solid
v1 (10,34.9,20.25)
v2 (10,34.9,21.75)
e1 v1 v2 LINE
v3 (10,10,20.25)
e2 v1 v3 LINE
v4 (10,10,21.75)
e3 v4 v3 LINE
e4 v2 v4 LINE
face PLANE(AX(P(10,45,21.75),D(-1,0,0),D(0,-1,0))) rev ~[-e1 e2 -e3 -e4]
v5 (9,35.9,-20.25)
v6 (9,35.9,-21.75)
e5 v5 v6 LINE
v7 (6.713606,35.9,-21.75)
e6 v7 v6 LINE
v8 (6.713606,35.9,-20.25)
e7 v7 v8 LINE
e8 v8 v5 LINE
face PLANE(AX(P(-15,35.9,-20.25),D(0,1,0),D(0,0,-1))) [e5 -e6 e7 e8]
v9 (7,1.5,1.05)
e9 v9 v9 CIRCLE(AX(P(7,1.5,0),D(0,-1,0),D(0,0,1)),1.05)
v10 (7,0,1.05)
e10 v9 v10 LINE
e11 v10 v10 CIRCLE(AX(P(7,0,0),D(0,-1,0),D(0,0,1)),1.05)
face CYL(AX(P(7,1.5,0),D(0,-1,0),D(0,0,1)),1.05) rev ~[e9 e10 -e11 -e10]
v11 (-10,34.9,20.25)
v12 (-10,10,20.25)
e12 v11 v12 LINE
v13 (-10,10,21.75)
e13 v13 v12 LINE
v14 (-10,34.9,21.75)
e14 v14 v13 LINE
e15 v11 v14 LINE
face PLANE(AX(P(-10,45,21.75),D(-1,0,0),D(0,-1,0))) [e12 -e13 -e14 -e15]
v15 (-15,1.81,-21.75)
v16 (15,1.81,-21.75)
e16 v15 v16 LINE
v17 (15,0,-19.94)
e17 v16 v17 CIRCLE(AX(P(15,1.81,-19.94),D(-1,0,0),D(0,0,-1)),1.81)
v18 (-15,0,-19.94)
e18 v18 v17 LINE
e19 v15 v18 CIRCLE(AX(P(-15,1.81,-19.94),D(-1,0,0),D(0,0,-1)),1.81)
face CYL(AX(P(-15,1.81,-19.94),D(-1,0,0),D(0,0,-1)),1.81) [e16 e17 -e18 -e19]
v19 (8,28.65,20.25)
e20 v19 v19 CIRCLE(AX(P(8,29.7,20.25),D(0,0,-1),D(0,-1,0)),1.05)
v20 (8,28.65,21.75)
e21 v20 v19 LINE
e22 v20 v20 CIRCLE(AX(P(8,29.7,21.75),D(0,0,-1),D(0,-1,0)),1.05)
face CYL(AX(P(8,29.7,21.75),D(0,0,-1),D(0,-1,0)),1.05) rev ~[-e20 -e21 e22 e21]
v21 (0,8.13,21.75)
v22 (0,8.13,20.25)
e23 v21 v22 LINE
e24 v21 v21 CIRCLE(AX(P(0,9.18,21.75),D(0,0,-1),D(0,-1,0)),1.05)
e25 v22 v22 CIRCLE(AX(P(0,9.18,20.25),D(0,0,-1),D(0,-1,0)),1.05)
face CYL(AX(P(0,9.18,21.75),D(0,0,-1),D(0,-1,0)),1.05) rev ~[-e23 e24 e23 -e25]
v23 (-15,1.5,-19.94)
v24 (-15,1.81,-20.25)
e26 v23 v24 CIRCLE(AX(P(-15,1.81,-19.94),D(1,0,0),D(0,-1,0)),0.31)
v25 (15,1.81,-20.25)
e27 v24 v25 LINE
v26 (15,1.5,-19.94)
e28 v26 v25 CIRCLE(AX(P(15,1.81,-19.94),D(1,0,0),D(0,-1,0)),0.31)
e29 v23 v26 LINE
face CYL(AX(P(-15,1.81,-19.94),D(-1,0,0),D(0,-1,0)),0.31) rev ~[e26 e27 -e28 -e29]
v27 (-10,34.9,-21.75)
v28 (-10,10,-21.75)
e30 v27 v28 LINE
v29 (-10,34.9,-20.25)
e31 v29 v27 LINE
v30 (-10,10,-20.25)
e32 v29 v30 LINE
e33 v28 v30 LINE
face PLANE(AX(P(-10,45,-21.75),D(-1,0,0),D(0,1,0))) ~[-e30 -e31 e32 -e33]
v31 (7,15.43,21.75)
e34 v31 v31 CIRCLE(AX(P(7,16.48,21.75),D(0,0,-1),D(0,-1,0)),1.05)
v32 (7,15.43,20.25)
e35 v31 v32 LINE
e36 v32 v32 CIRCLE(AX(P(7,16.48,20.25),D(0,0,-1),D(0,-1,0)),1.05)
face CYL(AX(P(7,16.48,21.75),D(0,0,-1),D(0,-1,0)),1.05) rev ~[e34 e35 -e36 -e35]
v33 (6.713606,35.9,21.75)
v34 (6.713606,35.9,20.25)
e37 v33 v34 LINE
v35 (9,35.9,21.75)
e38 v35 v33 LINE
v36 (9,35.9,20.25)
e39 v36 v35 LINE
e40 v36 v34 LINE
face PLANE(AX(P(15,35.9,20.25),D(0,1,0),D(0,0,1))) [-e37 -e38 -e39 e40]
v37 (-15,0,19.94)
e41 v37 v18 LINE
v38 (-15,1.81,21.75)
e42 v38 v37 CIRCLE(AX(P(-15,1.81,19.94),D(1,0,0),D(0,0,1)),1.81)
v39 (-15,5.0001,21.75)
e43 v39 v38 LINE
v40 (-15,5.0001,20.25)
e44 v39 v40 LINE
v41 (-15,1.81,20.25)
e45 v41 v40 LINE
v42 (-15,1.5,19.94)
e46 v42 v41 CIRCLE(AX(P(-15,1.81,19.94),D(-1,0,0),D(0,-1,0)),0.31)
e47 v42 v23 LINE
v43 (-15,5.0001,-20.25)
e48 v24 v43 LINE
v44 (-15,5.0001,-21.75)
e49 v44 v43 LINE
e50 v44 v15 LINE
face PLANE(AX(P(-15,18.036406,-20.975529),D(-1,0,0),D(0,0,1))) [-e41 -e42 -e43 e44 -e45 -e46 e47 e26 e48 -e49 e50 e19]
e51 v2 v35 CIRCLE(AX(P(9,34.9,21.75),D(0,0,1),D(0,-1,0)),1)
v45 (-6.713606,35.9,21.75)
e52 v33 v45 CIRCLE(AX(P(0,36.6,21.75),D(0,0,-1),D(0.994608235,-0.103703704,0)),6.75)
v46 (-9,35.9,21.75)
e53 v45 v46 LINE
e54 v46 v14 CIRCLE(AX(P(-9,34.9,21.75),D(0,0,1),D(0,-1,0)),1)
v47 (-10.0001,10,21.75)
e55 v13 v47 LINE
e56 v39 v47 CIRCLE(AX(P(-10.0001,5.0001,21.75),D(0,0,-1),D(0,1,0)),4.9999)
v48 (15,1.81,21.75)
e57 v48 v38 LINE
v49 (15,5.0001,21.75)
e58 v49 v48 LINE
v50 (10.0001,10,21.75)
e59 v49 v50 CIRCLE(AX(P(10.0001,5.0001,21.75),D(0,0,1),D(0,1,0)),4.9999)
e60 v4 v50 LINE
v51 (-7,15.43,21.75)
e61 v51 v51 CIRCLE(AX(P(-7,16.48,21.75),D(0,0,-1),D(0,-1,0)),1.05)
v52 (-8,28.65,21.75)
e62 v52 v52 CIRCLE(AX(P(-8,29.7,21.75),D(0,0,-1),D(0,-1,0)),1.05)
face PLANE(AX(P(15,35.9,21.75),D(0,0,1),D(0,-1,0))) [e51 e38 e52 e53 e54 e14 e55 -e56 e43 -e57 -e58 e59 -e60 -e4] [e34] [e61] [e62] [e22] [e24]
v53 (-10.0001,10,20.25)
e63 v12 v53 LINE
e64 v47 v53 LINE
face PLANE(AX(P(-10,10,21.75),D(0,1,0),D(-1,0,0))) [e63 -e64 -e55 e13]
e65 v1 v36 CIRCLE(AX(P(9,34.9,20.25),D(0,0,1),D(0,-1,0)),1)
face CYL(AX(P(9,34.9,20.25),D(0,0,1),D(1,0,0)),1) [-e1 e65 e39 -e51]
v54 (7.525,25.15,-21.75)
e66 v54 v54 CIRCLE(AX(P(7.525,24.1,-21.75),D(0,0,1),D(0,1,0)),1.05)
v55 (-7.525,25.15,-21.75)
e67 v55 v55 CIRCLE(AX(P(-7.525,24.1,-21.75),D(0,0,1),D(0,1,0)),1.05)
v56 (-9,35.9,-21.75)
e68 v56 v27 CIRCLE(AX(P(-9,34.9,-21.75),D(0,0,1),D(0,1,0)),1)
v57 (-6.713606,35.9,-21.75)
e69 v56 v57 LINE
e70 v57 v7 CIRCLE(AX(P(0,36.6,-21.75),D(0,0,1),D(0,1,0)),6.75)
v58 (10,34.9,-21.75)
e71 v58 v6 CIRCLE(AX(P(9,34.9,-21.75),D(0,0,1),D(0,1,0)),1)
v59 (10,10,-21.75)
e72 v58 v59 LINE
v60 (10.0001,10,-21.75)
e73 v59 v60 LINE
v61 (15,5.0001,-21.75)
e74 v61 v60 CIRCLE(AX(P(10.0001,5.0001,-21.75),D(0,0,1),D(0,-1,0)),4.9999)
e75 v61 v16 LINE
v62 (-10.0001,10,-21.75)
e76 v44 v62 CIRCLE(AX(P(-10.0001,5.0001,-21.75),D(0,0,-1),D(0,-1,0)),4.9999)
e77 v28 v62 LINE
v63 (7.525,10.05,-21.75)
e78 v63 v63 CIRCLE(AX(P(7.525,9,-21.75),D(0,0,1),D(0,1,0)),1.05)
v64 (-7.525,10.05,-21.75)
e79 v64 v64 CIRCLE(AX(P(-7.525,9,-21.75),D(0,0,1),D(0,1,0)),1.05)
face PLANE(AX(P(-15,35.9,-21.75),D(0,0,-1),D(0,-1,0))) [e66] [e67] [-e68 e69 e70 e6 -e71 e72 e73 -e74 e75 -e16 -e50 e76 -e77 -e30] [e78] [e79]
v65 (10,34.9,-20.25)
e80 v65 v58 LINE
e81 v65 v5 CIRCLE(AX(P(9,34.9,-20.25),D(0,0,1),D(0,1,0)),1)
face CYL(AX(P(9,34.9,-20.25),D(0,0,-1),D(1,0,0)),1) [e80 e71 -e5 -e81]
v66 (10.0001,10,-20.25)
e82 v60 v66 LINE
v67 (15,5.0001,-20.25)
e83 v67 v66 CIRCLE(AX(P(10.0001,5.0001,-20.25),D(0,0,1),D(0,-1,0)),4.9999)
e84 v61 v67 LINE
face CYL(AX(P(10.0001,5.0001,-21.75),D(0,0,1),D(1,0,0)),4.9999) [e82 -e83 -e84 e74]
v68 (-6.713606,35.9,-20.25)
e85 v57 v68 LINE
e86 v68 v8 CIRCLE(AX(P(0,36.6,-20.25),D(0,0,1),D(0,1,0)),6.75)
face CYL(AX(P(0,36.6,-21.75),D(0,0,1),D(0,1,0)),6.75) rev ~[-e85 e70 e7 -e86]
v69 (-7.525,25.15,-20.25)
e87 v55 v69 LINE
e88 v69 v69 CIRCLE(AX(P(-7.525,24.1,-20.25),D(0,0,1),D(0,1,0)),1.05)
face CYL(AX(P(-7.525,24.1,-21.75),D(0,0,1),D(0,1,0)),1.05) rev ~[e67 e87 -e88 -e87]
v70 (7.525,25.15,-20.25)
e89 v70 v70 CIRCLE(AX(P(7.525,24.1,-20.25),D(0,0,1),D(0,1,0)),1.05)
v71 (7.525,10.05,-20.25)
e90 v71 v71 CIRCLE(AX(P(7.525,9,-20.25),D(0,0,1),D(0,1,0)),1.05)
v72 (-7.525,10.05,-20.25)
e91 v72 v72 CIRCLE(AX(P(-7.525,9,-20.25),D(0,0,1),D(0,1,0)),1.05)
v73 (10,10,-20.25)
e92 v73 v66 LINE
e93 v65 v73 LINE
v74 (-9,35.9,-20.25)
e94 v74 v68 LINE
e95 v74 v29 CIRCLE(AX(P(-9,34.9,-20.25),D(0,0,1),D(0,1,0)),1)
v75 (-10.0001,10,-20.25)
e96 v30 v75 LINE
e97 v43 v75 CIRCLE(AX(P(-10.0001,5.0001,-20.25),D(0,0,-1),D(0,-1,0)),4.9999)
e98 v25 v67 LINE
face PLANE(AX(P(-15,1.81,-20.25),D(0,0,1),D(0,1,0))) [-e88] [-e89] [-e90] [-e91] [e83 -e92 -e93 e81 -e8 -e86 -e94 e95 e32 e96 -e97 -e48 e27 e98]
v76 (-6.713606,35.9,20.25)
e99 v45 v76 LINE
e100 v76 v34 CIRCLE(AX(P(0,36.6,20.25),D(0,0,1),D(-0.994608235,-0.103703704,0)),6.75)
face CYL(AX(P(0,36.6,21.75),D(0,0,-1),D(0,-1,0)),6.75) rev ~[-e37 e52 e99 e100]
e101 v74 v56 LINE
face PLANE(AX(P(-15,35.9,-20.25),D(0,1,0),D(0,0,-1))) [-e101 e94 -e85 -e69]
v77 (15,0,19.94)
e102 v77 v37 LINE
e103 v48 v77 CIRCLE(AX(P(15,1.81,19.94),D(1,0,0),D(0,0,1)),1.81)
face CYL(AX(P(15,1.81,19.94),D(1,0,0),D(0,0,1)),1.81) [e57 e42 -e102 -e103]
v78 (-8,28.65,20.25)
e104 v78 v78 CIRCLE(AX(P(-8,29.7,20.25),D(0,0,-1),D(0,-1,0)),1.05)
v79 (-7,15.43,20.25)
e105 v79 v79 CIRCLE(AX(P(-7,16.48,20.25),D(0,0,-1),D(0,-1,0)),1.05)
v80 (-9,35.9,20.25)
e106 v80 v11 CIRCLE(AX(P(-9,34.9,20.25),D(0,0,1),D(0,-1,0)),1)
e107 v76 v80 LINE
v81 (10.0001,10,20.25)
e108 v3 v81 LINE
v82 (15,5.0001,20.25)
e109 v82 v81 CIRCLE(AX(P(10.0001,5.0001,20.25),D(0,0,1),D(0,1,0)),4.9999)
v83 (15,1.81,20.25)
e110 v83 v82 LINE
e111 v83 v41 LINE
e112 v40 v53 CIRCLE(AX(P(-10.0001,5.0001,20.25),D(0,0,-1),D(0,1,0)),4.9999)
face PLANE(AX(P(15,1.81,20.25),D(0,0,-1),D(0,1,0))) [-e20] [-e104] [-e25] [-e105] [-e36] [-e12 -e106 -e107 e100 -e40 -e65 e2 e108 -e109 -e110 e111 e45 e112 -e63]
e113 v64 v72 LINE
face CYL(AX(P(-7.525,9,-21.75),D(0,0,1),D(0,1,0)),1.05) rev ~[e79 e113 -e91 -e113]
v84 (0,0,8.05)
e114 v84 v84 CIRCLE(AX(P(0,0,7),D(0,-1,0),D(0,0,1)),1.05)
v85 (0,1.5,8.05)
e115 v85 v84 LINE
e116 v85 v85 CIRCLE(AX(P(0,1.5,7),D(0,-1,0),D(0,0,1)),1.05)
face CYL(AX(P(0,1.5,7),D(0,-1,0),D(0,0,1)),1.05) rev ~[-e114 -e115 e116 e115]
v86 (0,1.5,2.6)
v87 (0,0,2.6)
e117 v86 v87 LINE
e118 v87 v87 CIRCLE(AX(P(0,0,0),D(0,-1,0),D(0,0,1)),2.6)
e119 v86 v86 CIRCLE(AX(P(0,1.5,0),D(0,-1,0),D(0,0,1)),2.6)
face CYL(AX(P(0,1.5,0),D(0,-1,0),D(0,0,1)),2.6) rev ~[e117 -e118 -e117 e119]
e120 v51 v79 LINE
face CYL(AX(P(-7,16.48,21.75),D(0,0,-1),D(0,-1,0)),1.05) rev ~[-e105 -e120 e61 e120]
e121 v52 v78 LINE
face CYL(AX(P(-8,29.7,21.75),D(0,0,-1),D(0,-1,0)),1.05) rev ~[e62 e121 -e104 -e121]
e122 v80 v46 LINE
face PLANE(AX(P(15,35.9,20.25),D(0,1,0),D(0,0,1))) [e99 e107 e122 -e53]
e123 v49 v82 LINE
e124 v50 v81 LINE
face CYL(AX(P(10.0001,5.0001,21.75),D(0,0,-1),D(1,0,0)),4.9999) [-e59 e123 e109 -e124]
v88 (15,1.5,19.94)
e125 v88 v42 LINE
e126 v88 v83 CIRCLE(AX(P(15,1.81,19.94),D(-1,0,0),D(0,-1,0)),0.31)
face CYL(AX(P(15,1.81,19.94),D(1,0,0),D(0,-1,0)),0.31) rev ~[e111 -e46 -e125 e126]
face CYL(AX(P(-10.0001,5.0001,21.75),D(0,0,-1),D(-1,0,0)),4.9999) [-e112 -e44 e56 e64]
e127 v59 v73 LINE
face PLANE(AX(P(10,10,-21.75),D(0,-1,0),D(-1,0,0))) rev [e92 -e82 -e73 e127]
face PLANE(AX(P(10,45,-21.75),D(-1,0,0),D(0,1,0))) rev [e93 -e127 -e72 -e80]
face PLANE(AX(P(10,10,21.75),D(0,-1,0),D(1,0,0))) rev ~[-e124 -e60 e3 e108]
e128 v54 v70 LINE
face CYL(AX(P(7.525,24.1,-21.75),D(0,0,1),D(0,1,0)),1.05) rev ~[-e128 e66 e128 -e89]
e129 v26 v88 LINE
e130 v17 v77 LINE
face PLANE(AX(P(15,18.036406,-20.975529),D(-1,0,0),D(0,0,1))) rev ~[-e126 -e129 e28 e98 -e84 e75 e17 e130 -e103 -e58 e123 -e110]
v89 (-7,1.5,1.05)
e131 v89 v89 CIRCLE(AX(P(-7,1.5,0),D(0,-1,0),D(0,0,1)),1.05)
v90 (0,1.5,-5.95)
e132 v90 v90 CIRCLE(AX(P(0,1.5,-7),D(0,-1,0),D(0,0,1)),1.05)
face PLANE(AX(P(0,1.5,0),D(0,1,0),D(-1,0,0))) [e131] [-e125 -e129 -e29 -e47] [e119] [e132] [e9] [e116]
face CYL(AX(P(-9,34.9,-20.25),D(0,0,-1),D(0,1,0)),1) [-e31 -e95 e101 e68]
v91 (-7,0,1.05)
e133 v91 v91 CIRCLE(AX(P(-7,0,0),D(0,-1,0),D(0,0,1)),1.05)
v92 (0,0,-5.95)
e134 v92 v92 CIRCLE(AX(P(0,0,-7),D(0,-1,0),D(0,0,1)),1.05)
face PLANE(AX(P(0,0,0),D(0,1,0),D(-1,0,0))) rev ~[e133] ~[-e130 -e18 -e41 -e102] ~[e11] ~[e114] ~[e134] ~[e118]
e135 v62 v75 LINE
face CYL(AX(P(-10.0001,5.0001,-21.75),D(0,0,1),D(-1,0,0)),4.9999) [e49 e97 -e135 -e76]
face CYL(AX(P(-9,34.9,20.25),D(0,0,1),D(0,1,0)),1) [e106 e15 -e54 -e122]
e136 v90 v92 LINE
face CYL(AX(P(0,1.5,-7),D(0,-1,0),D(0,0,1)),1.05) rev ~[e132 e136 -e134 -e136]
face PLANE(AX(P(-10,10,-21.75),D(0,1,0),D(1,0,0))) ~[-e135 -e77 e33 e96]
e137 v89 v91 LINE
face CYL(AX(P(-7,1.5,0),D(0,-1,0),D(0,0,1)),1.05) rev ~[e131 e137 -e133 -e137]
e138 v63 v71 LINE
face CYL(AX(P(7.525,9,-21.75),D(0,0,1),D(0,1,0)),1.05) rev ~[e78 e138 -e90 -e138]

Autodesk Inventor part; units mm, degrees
ref_plane "YZ Plane" through (0, 0, 0) normal (1, 0, 0) x (0, 1, 0)
ref_plane "XZ Plane" through (0, 0, 0) normal (0, 1, 0) x (-1, 0, 0)
ref_plane "XY Plane" through (0, 0, 0) normal (0, 0, 1) x (1, 0, 0)
sketch "Sketch1" plane through (0, 0, 0) normal (0, 1, 0) x (-1, 0, 0)
  line L0 (-15, 20.25) -> (15, 20.25)
  line L1 (15, 20.25) -> (15, -20.25)
  line L2 (15, -20.25) -> (-15, -20.25)
  line L3 (-15, -20.25) -> (-15, 20.25)
  line L4 (-15, 20.25) -> (15, -20.25) construction
  line L5 (15, 20.25) -> (-15, -20.25) construction
  point P0 (0, 0)
  dimension "d0" = 40.5
  dimension "d1" = 30
extrude "Plate1" add sketch "Sketch1" along normal blind 1.5
sketch "Sketch2" plane through (-15, 0, -21.75) normal (0, 0, 1) x (1, 0, 0)
  line L0 (30, 0) -> (0, 0)
  line L1 (0, 0) -> (0, 35.9)
  line L2 (0, 35.9) -> (30, 35.9)
  line L3 (30, 35.9) -> (30, 0)
edge flange "Flange1" height 35.9 angle 90 thickness 1.5 bend radius 0.31 thickness toward (0, 0, 1) relief tear relief width 1.5 relief depth 0.75 corner gap 0.31 corner form 0 edges at (0, 1.5, -20.25) (0, 1.5, 20.25) wall of the first edge with corners at (15, 0, -21.75) (-15, 0, -21.75) (-15, 35.9, -21.75) (15, 35.9, -21.75)
bend "Bend1"
corner "Corner1"
sketch "Sketch3" plane through (0, 1.5, 0) normal (0, 1, 0) x (1, 0, 0)
  circle A0 centre (7, 0) radius 0.7835 projected
  circle A1 centre (0, -7) radius 0.7835 projected
  circle A2 centre (-7, 0) radius 0.7835 projected
  circle A3 centre (0, 7) radius 0.7835 projected
  point P0 (0, 0)
hole "Hole1" at (0, 1.5, 7) at (7, 1.5, 0) at (-7, 1.5, 0) at (0, 1.5, -7) direction (0, -1, 0) diameter 2.1 depth 1.5
sketch "Sketch26" plane through (-15, 35.9, 21.75) normal (0, 0, 1) x (1, 0, 0)
  line L0 (30, 9.1) -> (25, 9.1)
  line L1 (25, 9.1) -> (25, -25.9)
  line L2 (25, -25.9) -> (30, -25.9)
  line L3 (30, -25.9) -> (30, 9.1)
  line L4 (0, 9.1) -> (5, 9.1)
  line L5 (5, 9.1) -> (5, -25.9)
  line L6 (5, -25.9) -> (0, -25.9)
  line L7 (0, -25.9) -> (0, 9.1)
  point P0 (15, -35.9)
  dimension "d91" = 35
  dimension "d92" = 5
  dimension "d93" = 10
  dimension "d94" = 10
  dimension "d95" = 5
  dimension "d96" = 35
  dimension "d97" = 10
  dimension "d98" = 10
extrude "Cut11" cut sketch "Sketch26" against normal blind 1.5
fillet "Corner Round1" radius 5 1 edges at (-15, 10, 21)
fillet "Corner Round2" radius 5 1 edges at (15, 10, 21)
mirror "Mirror1" about plane through (0, 0, 0) normal (0, 0, 1) of "Cut11"
fillet "Corner Round3" radius 5 1 edges at (-15, 10, -21)
fillet "Corner Round4" radius 5 1 edges at (15, 10, -21)
fillet "Corner Round5" radius 1 4 edges at (10, 35.9, -21) (10, 35.9, 21) (-10, 35.9, 21) (-10, 35.9, -21)
sketch "Sketch31" plane through (-15, 1.81, 21.75) normal (0, 0, 1) x (1, 0, 0)
  point P0 (15, -1.81)
sketch "Sketch34" plane through (0, 1.5, 0) normal (0, 1, 0) x (1, 0, 0)
  circle A0 centre (0, 0) radius 1.2295
  point P0 (0, 0)
hole "Hole13" at (0, 1.5, 0) direction (0, -1, 0) diameter 5.2 depth 1.5
sketch "Sketch35" plane through (-15, 1.81, 21.75) normal (0, 0, 1) x (1, 0, 0)
  circle A0 centre (15, 34.79) radius 4.5 projected
  point P0 (15, -1.81)
hole "Hole14" at (0, 36.6, 21.75) direction (0, 0, -1) diameter 13.5 depth 1.5
sketch "Sketch36" plane through (15, 1.81, -21.75) normal (0, 0, -1) x (-1, 0, 0)
  circle A0 centre (15, 34.79) radius 5 projected
  point P0 (15, -1.81)
hole "Hole15" at (0, 36.6, -21.75) direction (0, 0, 1) diameter 13.5 depth 1.5
sketch "Sketch37" plane through (-15, 1.81, 21.75) normal (0, 0, 1) x (1, 0, 0)
  circle A0 centre (15, 7.37) radius 0.7835 projected
  circle A1 centre (8, 14.67) radius 0.7835 projected
  circle A2 centre (22, 14.67) radius 0.7835 projected
  circle A3 centre (7, 27.89) radius 0.7835 projected
  circle A4 centre (23, 27.89) radius 0.7835 projected
  point P0 (15, -1.81)
hole "Hole16" at (0, 9.18, 21.75) at (-7, 16.48, 21.75) at (7, 16.48, 21.75) at (-8, 29.7, 21.75) at (8, 29.7, 21.75) direction (0, 0, -1) diameter 2.1 depth 1.5
sketch "Sketch38" plane through (15, 1.81, -21.75) normal (0, 0, -1) x (-1, 0, 0)
  circle A0 centre (22.525, 22.29) radius 0.7835 projected
  circle A1 centre (22.525, 7.19) radius 0.7835 projected
  circle A2 centre (7.475, 7.19) radius 0.7835 projected
  circle A3 centre (7.475, 22.29) radius 0.7835 projected
  point P0 (15, -1.81)
hole "Hole17" at (-7.525, 24.1, -21.75) at (7.525, 24.1, -21.75) at (-7.525, 9, -21.75) at (7.525, 9, -21.75) direction (0, 0, 1) diameter 2.1 depth 1.5
equation "\"d18\" = Thickness"
equation "\"d99\" = Thickness"
equation "\"d143\" = Thickness"
equation "\"d150\" = Thickness"
equation "\"d157\" = Thickness"
equation "\"d164\" = Thickness"
equation "\"d171\" = Thickness"
equation "\"d2\" = Thickness"
equation "\"d3\" = BendReliefWidth"
equation "\"d4\" = BendReliefDepth"
equation "\"d5\" = MinimumRemnant"
equation "\"d6\" = TransitionRadius"
equation "\"d9\" = BendRadius"
equation "\"d10\" = CornerReliefSize"
equation "\"d11\" = GapSize"
equation "\"d12\" = JacobiRadiusSize"
equation "\"BendReliefWidth\" = Thickness"
equation "\"BendReliefDepth\" = 0.5 * Thickness"
equation "\"CornerReliefSize\" = 4 * Thickness"
equation "\"MinimumRemnant\" = 2 * Thickness"
equation "\"TransitionRadius\" = BendRadius"
equation "\"JacobiRadiusSize\" = BendRadius"
equation "\"GapSize\" = Thickness"
equation "\"Thickness\" = 1.5"
equation "\"BendRadius\" = 0.31"
properties part number "axis_13_top_frame" material "Aluminum 6061-AHC"
